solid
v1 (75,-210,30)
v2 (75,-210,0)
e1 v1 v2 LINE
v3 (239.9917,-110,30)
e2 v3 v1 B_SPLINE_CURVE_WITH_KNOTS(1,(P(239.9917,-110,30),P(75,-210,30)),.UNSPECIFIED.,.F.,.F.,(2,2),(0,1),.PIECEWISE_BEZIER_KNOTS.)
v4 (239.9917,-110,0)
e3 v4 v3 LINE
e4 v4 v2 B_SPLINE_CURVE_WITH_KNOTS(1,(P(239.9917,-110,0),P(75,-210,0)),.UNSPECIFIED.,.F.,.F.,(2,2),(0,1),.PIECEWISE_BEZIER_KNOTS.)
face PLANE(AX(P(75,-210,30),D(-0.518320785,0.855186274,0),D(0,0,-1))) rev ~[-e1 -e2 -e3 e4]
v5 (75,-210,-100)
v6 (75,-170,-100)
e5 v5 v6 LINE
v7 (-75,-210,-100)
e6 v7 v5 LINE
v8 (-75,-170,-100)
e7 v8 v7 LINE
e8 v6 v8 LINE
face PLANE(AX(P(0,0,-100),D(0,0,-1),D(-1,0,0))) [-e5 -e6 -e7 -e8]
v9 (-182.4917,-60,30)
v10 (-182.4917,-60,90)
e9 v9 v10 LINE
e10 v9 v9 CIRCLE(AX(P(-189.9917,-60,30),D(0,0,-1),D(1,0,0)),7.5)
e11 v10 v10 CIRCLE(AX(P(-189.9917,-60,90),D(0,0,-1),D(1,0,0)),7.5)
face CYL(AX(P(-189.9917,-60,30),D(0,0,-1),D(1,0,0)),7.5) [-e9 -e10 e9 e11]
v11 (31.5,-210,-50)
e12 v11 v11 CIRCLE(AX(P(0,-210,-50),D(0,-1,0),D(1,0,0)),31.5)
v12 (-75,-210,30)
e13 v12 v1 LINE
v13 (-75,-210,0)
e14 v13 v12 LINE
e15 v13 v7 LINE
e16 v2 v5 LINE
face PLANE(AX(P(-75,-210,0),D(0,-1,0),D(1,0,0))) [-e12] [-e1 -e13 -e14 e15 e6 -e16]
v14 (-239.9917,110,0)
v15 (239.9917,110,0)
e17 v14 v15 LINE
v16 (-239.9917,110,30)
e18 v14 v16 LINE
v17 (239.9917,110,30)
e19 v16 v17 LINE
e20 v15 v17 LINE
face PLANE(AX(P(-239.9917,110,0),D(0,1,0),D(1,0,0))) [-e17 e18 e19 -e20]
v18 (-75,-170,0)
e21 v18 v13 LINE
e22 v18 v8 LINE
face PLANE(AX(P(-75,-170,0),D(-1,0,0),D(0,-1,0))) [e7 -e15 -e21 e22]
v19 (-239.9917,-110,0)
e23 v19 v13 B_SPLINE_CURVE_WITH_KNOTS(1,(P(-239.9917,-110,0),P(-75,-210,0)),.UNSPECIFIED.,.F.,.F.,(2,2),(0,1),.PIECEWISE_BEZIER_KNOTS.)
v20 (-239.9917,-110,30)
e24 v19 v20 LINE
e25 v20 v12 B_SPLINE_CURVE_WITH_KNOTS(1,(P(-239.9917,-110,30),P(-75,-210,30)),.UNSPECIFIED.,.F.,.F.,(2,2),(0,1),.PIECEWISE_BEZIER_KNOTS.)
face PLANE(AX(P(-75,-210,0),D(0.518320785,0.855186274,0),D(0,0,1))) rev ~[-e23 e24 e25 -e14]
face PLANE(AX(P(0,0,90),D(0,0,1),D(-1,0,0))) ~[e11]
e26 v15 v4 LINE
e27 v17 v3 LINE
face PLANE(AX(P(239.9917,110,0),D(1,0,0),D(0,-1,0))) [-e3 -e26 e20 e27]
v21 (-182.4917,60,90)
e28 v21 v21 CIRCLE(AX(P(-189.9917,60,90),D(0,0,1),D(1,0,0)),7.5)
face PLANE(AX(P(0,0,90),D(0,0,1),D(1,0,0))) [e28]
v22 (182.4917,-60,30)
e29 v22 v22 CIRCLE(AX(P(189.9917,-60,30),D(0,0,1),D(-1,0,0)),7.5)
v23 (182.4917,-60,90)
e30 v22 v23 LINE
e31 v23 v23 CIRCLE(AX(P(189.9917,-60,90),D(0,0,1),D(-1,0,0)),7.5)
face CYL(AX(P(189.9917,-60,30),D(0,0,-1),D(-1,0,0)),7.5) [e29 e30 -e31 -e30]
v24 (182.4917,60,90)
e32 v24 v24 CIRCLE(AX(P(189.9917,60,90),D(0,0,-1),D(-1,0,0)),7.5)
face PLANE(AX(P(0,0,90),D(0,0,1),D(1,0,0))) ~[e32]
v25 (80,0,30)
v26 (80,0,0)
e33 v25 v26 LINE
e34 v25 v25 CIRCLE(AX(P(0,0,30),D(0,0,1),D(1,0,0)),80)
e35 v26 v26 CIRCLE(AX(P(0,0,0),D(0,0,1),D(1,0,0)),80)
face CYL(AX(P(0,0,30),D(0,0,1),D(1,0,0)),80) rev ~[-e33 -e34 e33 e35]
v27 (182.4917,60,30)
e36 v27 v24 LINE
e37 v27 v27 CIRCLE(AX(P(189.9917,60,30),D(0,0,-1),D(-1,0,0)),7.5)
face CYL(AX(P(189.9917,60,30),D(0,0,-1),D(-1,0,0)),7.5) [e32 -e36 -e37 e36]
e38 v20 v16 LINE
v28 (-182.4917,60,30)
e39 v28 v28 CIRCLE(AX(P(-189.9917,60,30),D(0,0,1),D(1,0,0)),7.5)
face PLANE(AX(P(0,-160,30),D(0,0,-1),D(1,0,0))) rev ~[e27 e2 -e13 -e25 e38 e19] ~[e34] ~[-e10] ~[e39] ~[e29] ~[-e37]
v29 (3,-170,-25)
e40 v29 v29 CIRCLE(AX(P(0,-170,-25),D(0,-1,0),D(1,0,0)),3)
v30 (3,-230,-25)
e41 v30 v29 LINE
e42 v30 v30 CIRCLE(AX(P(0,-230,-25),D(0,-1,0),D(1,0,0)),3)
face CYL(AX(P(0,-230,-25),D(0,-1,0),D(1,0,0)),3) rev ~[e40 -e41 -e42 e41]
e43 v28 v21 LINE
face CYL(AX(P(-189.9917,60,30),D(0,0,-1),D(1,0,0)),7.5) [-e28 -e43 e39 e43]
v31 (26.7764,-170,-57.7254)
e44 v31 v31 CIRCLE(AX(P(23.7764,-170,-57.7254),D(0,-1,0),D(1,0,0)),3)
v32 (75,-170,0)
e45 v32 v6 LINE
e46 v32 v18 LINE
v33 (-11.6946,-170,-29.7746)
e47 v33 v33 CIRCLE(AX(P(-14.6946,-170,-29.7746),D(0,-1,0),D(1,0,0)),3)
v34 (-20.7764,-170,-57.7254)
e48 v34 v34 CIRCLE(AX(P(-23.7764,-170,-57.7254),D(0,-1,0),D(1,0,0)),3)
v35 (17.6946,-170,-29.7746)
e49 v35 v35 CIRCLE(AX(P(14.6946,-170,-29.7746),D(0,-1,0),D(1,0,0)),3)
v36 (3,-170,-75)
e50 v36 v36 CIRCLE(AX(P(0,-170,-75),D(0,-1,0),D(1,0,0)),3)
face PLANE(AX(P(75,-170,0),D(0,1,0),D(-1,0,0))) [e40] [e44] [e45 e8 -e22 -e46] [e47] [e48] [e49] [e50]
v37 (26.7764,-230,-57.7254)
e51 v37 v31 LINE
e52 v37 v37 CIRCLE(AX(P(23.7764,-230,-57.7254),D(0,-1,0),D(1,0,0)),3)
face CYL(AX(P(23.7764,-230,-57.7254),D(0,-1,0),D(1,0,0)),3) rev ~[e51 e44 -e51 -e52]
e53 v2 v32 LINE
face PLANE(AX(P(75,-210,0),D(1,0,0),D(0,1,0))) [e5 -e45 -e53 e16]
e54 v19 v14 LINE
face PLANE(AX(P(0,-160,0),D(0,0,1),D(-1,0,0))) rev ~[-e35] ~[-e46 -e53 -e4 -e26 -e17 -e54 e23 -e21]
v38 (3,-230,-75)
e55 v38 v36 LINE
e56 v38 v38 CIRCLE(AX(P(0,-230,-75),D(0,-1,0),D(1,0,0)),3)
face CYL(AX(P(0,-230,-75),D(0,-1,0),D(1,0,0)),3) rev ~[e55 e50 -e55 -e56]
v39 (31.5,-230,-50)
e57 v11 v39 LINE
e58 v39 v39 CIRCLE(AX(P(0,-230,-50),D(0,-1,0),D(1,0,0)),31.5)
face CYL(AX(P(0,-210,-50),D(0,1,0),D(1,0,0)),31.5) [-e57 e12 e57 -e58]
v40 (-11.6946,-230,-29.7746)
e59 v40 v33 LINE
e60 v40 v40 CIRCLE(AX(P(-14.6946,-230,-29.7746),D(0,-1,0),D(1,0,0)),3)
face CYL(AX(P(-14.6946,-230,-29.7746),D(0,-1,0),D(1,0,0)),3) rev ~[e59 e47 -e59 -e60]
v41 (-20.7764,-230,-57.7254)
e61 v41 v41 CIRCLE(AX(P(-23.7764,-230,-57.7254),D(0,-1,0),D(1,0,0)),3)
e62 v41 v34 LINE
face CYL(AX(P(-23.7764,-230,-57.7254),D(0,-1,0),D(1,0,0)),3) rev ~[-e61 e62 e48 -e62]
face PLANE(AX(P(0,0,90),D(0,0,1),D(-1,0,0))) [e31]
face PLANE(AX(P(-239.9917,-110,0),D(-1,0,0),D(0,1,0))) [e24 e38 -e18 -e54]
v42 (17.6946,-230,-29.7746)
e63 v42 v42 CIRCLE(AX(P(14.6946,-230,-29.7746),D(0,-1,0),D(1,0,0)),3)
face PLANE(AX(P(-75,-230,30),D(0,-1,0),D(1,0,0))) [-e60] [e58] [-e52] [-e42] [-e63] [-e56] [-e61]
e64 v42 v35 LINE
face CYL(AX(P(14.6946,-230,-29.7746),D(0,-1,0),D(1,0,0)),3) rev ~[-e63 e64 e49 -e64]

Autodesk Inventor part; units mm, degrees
ref_plane "YZ Plane" through (0, 0, 0) normal (1, 0, 0) x (0, 1, 0)
ref_plane "XZ Plane" through (0, 0, 0) normal (0, 1, 0) x (-1, 0, 0)
sketch "Boceto1" plane through (0, 0, 0) normal (0, 0, 1) x (1, 0, 0)
  circle A0 centre (0, 0) radius 264 construction
  line L0 (-239.9917, 110) -> (239.9917, 110)
  line L1 (239.9917, 110) -> (239.9917, -110)
  line L2 (239.9917, -110) -> (-239.9917, -110)
  line L3 (-239.9917, -110) -> (-239.9917, 110)
  line L4 (-239.9917, 110) -> (239.9917, -110) construction
  line L5 (239.9917, 110) -> (-239.9917, -110) construction
  dimension "d0" = 528
  dimension "d1" = 220
extrude "Extrusión1" add sketch "Boceto1" along normal blind 30
sketch "Boceto2" plane through (0, 0, 30) normal (0, 0, 1) x (1, 0, 0)
  circle A0 centre (-189.9917, 60) radius 7.5
  line L0 (239.9917, 110) -> (-239.9917, 110) construction
  line L1 (-239.9917, 110) -> (-239.9917, -110) construction
  point P0 (0, 0)
  dimension "d4" = 15
  dimension "d5" = 50
  dimension "d6" = 50
extrude "Extrusión2" add sketch "Boceto2" along normal blind 60
mirror "Simetría1" about plane through (0, 0, 0) normal (1, 0, 0) of "Extrusión2"
mirror "Simetría2" about plane through (0, 0, 0) normal (0, 1, 0) of "Extrusión2", "Simetría1"
sketch "Boceto3" plane through (0, 0, 30) normal (0, 0, 1) x (1, 0, 0)
  circle A0 centre (0, 0) radius 80
  dimension "d17" = 160
extrude "Extrusión3" cut sketch "Boceto3" along normal through all both and the other way through all
sketch "Boceto9" plane through (-239.9917, -110, 0) normal (0, -1, 0) x (1, 0, 0)
  line L0 (0, 30) -> (479.9833, 30) projected
  line L1 (479.9833, 0) -> (0, 0) projected
  line L2 (0, 30) -> (479.9833, 30)
  line L3 (479.9833, 30) -> (479.9833, 0)
  line L4 (479.9833, 0) -> (0, 0)
  line L5 (0, 0) -> (0, 30)
  point P0 (239.9917, 0)
ref_plane "Plano de trabajo1" through (-239.9917, -210, 0) normal (0, -1, 0) x (1, 0, 0)
sketch "Boceto10" plane through (-239.9917, -210, 0) normal (0, -1, 0) x (1, 0, 0)
  line L0 (0, 0) -> (479.9833, 0) construction
  line L1 (479.9833, 0) -> (479.9833, 30) construction
  line L2 (0, 30) -> (479.9833, 30) construction
  line L3 (0, 0) -> (0, 30) construction
  line L4 (164.9917, 30) -> (314.9917, 30)
  line L5 (314.9917, 30) -> (314.9917, 0)
  line L6 (314.9917, 0) -> (164.9917, 0)
  line L7 (164.9917, 0) -> (164.9917, 30)
  point P0 (239.9917, 0)
  point P1 (239.9917, 30)
  dimension "d41" = 150
  dimension "d42" = 30
loft "Solevación1" add profiles "Boceto10" section 1 edges at (0, -110, 0) (239.9917, -110, 15) (0, -110, 30) (-239.9917, -110, 15)
sketch "Boceto11" plane through (0, 0, 0) normal (0, 0, -1) x (-1, 0, 0)
  line L0 (75, -210) -> (-75, -210)
  line L1 (-75, -210) -> (-75, -170)
  line L2 (-75, -170) -> (75, -170)
  line L3 (75, -170) -> (75, -210)
  line L4 (-75, -210) -> (75, -210) projected
  point P0 (0, 0)
  point P1 (0, -210)
  dimension "d48" = 150
  dimension "d49" = 40
extrude "Extrusión8" add sketch "Boceto11" along normal blind 100
sketch "Boceto12" plane through (-75, -210, 30) normal (0, -1, 0) x (1, 0, 0)
  line L0 (150, -130) -> (0, -130) construction
  line L1 (0, -30) -> (0, 0) construction
  line L2 (150, -130) -> (0, -130) construction
  line L3 (0, -130) -> (0, -30) construction
  line L4 (0, -30) -> (150, -30) construction
  line L5 (150, -30) -> (150, -130) construction
  line L6 (150, 0) -> (150, -30) construction
  line L7 (150, -30) -> (0, -130) construction
  line L8 (0, -30) -> (150, -130) construction
  circle A0 centre (75, -80) radius 31.5
  point P0 (75, -30)
  dimension "d52" = 63
extrude "Extrusión9" add sketch "Boceto12" along normal blind 20
sketch "Boceto13" plane through (0, -230, -50) normal (0, -1, 0) x (1, 0, 0)
  circle A0 centre (0, 0) radius 25 construction
  circle A1 centre (0, 25) radius 3
  circle A2 centre (0, -25) radius 3
  circle A3 centre (23.7764, -7.7254) radius 3
  circle A4 centre (14.6946, 20.2254) radius 3
  circle A5 centre (-14.6946, 20.2254) radius 3
  circle A6 centre (-23.7764, -7.7254) radius 3
  point P0 (0, 50)
  dimension "d55" = 50
  dimension "d56" = 6
  dimension "d57" = 6
  dimension "d60" = 360
extrude "Extrusión10" cut sketch "Boceto13" against normal up to next
equation "\"d0\" = 0.8 * diametro_llanta"
equation "\"d1\" = 0.333333 * diametro_llanta"
equation "\"d2\" = espesor_soporte"
equation "\"d4\" = 0.5 * espesor_soporte"
equation "\"d7\" = 2 * espesor_soporte"
equation "\"d42\" = espesor_soporte"
equation "\"ancho_llanta\" = 271000"
equation "\"espesor_soporte\" = 30"
equation "\"diametro_llanta\" = 660"
properties part number "soporte" material "Acerito"
